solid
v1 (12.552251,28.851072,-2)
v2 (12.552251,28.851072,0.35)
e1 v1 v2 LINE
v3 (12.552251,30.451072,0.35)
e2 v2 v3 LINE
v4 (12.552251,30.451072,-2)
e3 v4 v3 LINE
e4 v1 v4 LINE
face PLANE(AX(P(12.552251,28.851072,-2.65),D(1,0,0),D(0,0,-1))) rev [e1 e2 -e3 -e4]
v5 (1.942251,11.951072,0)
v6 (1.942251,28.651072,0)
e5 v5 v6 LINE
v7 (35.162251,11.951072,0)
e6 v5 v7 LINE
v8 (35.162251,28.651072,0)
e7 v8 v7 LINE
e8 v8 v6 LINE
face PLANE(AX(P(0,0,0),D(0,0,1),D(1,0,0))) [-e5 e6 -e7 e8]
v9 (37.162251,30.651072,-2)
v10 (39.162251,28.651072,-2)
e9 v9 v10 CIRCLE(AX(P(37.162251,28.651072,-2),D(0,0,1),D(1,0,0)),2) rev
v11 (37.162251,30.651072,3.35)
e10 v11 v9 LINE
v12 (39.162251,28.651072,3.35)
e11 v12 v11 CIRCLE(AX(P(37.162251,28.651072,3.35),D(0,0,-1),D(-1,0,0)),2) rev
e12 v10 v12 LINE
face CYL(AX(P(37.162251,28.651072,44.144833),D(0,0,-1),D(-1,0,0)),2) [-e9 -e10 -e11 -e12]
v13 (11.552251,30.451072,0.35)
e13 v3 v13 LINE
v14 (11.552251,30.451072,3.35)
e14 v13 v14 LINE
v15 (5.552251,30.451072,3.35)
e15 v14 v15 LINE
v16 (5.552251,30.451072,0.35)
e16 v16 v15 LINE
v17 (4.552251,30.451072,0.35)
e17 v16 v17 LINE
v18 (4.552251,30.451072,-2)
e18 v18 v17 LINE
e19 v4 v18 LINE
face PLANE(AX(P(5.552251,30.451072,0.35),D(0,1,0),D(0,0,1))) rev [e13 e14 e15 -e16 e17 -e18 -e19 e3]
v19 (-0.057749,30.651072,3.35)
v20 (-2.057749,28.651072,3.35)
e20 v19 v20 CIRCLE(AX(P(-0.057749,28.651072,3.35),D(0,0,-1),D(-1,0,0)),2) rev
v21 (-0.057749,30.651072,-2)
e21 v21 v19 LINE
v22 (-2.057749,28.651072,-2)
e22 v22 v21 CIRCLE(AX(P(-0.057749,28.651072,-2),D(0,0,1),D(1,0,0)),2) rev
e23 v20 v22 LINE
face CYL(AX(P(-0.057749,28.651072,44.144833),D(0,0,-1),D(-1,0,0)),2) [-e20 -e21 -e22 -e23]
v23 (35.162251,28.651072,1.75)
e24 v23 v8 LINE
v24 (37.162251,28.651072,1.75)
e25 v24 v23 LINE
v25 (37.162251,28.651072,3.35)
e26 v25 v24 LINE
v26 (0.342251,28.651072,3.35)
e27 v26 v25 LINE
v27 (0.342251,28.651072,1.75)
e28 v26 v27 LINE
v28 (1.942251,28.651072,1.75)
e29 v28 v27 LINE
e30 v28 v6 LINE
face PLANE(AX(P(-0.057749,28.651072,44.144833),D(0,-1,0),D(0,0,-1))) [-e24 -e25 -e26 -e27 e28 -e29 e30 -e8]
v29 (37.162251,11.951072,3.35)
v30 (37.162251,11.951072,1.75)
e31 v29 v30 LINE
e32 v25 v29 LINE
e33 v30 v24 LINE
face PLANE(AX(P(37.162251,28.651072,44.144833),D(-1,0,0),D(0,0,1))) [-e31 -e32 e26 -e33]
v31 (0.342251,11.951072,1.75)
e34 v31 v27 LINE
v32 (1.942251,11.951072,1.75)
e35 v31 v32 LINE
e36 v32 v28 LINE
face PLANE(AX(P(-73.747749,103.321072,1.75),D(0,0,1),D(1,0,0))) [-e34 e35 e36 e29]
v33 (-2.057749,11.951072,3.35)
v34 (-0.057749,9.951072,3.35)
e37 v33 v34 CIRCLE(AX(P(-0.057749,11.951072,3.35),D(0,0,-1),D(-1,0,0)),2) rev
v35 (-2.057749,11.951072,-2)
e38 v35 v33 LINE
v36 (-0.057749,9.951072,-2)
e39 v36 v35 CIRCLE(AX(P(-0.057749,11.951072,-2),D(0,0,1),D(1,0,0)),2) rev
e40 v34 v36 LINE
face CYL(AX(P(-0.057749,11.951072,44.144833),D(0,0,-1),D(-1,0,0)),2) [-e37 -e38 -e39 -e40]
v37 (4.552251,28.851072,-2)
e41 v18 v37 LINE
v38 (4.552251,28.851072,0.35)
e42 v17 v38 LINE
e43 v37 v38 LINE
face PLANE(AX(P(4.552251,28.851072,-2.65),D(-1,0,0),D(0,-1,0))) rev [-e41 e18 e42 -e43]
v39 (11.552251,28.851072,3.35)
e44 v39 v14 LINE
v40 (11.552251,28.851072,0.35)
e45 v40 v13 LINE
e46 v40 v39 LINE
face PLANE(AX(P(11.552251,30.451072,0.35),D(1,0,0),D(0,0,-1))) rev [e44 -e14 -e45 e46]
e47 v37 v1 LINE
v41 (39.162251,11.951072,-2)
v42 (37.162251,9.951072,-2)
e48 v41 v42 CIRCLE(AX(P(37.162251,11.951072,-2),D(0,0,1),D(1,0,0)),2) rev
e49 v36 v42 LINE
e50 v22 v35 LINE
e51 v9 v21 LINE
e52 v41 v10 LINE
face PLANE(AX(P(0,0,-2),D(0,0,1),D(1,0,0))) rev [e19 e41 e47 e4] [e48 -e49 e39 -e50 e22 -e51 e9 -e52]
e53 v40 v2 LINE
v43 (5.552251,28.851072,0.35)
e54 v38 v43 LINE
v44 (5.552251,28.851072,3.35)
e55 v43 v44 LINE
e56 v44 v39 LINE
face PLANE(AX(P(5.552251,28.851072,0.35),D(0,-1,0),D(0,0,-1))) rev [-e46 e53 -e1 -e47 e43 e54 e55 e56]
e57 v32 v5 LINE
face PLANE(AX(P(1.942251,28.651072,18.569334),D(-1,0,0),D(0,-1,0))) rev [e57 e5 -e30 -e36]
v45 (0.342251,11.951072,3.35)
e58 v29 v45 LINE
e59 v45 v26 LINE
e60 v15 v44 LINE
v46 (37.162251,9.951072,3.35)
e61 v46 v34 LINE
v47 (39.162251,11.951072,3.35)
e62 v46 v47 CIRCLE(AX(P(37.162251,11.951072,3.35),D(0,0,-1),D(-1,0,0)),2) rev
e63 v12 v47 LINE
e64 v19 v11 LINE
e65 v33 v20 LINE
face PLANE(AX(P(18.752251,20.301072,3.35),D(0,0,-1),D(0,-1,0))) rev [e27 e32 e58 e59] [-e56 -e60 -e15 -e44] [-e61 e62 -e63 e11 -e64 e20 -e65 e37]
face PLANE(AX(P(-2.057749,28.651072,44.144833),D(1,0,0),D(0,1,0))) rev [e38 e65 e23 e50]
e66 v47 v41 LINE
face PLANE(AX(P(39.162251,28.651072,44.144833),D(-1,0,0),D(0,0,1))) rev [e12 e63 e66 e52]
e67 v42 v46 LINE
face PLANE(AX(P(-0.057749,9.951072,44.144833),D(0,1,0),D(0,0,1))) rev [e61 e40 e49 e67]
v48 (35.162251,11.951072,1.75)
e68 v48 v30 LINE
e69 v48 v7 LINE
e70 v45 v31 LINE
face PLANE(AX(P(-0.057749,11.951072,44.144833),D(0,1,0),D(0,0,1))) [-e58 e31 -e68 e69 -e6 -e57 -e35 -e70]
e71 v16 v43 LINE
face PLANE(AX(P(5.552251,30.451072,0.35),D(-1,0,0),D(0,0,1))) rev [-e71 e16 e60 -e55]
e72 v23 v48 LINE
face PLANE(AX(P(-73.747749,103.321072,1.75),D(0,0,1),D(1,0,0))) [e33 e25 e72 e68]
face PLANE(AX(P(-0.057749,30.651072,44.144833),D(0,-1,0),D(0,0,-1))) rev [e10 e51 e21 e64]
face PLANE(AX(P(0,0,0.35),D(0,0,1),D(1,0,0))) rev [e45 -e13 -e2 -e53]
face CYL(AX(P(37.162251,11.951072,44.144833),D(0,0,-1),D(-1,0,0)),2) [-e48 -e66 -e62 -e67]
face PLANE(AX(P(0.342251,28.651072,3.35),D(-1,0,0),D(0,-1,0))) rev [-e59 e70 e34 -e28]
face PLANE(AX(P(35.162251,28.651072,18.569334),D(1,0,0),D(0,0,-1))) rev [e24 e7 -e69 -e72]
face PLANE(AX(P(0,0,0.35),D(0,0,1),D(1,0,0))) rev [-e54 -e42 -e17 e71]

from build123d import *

# Parameters (mm, degrees)
CROQUIS1_W              = 37.22
CROQUIS1_H              = 16.7
SALIENTE_EXTRUIR1_DEPTH = 3.35
VACIADO1_T              = 2
REDONDEO1_R             = 2
CROQUIS2_W              = 2
CROQUIS2_H              = 16.7
SALIENTE_EXTRUIR2_DEPTH = 1.75
CROQUIS6_W              = 0.4
CROQUIS6_H              = 16.7
SALIENTE_EXTRUIR5_DEPTH = 1.6
CROQUIS7_W              = 6
CROQUIS7_H              = 1.6
CORTAR_EXTRUIR1_DEPTH   = 3
CROQUIS10_W             = 8
CROQUIS10_H             = 1.6
CORTAR_EXTRUIR2_DEPTH   = 3


with BuildPart() as part:
    # Croquis1 → Saliente-Extruir1 (new body)
    with BuildSketch(Plane.XY):
        with Locations((18.552250715, 20.301071835)):
            Rectangle(CROQUIS1_W, CROQUIS1_H)
    extrude(amount=SALIENTE_EXTRUIR1_DEPTH)

    # Vaciado1
    vaciado1_openings = [part.faces().sort_by_distance(p)[0] for p in [
        (18.552250715, 20.301071835, 3.35),
    ]]
    offset(amount=VACIADO1_T, openings=vaciado1_openings, kind=Kind.INTERSECTION)

    # Redondeo1
    # the kernel refuses this fillet: 2 mm, written as the material it takes off along each edge
    with BuildSketch(Plane(origin=(-2.057749285, 30.651071835, -7), x_dir=(1, 0, 0), z_dir=(0, 0, 1)), Plane(origin=(39.162250715, 30.651071835, 8.35), x_dir=(-1, 0, 0), z_dir=(0, 0, -1)), Plane(origin=(39.162250715, 9.951071835, 8.35), x_dir=(0, 1, 0), z_dir=(0, 0, -1)), Plane(origin=(-2.057749285, 9.951071835, 8.35), x_dir=(1, 0, 0), z_dir=(0, 0, -1))) as redondeo1_piece_1:
        with BuildLine():
            CenterArc((REDONDEO1_R, -REDONDEO1_R), REDONDEO1_R, 90, 90)
            Line((0, -REDONDEO1_R), (0, 0))
            Line((0, 0), (REDONDEO1_R, 0))
        make_face()
    extrude(amount=15.35, mode=Mode.SUBTRACT)

    # Croquis2 → Saliente-Extruir2 (add)
    with BuildSketch(Plane.XY):
        with Locations((0.942250715, 20.301071835)):
            Rectangle(CROQUIS2_W, CROQUIS2_H)
        with Locations((36.162250715, 20.301071835)):
            Rectangle(CROQUIS2_W, CROQUIS2_H)
    extrude(amount=SALIENTE_EXTRUIR2_DEPTH)

    # Croquis6 → Saliente-Extruir5 (add)
    with BuildSketch(Plane.XY.offset(1.75)):
        with Locations((0.142250715, 20.301071835)):
            Rectangle(CROQUIS6_W, CROQUIS6_H)
    extrude(amount=SALIENTE_EXTRUIR5_DEPTH)

    # Croquis7 → Cortar-Extruir1 (cut)
    with BuildSketch(Plane.XY.offset(3.35)):
        with Locations((8.552250715, 29.651071835)):
            Rectangle(CROQUIS7_W, CROQUIS7_H)
    extrude(amount=-CORTAR_EXTRUIR1_DEPTH, mode=Mode.SUBTRACT)

    # Croquis10 → Cortar-Extruir2 (cut)
    with BuildSketch(Plane.XY.offset(0.35)):
        with Locations((8.552250715, 29.651071835)):
            Rectangle(CROQUIS10_W, CROQUIS10_H)
    extrude(amount=-CORTAR_EXTRUIR2_DEPTH, mode=Mode.SUBTRACT)


solid = part.part
